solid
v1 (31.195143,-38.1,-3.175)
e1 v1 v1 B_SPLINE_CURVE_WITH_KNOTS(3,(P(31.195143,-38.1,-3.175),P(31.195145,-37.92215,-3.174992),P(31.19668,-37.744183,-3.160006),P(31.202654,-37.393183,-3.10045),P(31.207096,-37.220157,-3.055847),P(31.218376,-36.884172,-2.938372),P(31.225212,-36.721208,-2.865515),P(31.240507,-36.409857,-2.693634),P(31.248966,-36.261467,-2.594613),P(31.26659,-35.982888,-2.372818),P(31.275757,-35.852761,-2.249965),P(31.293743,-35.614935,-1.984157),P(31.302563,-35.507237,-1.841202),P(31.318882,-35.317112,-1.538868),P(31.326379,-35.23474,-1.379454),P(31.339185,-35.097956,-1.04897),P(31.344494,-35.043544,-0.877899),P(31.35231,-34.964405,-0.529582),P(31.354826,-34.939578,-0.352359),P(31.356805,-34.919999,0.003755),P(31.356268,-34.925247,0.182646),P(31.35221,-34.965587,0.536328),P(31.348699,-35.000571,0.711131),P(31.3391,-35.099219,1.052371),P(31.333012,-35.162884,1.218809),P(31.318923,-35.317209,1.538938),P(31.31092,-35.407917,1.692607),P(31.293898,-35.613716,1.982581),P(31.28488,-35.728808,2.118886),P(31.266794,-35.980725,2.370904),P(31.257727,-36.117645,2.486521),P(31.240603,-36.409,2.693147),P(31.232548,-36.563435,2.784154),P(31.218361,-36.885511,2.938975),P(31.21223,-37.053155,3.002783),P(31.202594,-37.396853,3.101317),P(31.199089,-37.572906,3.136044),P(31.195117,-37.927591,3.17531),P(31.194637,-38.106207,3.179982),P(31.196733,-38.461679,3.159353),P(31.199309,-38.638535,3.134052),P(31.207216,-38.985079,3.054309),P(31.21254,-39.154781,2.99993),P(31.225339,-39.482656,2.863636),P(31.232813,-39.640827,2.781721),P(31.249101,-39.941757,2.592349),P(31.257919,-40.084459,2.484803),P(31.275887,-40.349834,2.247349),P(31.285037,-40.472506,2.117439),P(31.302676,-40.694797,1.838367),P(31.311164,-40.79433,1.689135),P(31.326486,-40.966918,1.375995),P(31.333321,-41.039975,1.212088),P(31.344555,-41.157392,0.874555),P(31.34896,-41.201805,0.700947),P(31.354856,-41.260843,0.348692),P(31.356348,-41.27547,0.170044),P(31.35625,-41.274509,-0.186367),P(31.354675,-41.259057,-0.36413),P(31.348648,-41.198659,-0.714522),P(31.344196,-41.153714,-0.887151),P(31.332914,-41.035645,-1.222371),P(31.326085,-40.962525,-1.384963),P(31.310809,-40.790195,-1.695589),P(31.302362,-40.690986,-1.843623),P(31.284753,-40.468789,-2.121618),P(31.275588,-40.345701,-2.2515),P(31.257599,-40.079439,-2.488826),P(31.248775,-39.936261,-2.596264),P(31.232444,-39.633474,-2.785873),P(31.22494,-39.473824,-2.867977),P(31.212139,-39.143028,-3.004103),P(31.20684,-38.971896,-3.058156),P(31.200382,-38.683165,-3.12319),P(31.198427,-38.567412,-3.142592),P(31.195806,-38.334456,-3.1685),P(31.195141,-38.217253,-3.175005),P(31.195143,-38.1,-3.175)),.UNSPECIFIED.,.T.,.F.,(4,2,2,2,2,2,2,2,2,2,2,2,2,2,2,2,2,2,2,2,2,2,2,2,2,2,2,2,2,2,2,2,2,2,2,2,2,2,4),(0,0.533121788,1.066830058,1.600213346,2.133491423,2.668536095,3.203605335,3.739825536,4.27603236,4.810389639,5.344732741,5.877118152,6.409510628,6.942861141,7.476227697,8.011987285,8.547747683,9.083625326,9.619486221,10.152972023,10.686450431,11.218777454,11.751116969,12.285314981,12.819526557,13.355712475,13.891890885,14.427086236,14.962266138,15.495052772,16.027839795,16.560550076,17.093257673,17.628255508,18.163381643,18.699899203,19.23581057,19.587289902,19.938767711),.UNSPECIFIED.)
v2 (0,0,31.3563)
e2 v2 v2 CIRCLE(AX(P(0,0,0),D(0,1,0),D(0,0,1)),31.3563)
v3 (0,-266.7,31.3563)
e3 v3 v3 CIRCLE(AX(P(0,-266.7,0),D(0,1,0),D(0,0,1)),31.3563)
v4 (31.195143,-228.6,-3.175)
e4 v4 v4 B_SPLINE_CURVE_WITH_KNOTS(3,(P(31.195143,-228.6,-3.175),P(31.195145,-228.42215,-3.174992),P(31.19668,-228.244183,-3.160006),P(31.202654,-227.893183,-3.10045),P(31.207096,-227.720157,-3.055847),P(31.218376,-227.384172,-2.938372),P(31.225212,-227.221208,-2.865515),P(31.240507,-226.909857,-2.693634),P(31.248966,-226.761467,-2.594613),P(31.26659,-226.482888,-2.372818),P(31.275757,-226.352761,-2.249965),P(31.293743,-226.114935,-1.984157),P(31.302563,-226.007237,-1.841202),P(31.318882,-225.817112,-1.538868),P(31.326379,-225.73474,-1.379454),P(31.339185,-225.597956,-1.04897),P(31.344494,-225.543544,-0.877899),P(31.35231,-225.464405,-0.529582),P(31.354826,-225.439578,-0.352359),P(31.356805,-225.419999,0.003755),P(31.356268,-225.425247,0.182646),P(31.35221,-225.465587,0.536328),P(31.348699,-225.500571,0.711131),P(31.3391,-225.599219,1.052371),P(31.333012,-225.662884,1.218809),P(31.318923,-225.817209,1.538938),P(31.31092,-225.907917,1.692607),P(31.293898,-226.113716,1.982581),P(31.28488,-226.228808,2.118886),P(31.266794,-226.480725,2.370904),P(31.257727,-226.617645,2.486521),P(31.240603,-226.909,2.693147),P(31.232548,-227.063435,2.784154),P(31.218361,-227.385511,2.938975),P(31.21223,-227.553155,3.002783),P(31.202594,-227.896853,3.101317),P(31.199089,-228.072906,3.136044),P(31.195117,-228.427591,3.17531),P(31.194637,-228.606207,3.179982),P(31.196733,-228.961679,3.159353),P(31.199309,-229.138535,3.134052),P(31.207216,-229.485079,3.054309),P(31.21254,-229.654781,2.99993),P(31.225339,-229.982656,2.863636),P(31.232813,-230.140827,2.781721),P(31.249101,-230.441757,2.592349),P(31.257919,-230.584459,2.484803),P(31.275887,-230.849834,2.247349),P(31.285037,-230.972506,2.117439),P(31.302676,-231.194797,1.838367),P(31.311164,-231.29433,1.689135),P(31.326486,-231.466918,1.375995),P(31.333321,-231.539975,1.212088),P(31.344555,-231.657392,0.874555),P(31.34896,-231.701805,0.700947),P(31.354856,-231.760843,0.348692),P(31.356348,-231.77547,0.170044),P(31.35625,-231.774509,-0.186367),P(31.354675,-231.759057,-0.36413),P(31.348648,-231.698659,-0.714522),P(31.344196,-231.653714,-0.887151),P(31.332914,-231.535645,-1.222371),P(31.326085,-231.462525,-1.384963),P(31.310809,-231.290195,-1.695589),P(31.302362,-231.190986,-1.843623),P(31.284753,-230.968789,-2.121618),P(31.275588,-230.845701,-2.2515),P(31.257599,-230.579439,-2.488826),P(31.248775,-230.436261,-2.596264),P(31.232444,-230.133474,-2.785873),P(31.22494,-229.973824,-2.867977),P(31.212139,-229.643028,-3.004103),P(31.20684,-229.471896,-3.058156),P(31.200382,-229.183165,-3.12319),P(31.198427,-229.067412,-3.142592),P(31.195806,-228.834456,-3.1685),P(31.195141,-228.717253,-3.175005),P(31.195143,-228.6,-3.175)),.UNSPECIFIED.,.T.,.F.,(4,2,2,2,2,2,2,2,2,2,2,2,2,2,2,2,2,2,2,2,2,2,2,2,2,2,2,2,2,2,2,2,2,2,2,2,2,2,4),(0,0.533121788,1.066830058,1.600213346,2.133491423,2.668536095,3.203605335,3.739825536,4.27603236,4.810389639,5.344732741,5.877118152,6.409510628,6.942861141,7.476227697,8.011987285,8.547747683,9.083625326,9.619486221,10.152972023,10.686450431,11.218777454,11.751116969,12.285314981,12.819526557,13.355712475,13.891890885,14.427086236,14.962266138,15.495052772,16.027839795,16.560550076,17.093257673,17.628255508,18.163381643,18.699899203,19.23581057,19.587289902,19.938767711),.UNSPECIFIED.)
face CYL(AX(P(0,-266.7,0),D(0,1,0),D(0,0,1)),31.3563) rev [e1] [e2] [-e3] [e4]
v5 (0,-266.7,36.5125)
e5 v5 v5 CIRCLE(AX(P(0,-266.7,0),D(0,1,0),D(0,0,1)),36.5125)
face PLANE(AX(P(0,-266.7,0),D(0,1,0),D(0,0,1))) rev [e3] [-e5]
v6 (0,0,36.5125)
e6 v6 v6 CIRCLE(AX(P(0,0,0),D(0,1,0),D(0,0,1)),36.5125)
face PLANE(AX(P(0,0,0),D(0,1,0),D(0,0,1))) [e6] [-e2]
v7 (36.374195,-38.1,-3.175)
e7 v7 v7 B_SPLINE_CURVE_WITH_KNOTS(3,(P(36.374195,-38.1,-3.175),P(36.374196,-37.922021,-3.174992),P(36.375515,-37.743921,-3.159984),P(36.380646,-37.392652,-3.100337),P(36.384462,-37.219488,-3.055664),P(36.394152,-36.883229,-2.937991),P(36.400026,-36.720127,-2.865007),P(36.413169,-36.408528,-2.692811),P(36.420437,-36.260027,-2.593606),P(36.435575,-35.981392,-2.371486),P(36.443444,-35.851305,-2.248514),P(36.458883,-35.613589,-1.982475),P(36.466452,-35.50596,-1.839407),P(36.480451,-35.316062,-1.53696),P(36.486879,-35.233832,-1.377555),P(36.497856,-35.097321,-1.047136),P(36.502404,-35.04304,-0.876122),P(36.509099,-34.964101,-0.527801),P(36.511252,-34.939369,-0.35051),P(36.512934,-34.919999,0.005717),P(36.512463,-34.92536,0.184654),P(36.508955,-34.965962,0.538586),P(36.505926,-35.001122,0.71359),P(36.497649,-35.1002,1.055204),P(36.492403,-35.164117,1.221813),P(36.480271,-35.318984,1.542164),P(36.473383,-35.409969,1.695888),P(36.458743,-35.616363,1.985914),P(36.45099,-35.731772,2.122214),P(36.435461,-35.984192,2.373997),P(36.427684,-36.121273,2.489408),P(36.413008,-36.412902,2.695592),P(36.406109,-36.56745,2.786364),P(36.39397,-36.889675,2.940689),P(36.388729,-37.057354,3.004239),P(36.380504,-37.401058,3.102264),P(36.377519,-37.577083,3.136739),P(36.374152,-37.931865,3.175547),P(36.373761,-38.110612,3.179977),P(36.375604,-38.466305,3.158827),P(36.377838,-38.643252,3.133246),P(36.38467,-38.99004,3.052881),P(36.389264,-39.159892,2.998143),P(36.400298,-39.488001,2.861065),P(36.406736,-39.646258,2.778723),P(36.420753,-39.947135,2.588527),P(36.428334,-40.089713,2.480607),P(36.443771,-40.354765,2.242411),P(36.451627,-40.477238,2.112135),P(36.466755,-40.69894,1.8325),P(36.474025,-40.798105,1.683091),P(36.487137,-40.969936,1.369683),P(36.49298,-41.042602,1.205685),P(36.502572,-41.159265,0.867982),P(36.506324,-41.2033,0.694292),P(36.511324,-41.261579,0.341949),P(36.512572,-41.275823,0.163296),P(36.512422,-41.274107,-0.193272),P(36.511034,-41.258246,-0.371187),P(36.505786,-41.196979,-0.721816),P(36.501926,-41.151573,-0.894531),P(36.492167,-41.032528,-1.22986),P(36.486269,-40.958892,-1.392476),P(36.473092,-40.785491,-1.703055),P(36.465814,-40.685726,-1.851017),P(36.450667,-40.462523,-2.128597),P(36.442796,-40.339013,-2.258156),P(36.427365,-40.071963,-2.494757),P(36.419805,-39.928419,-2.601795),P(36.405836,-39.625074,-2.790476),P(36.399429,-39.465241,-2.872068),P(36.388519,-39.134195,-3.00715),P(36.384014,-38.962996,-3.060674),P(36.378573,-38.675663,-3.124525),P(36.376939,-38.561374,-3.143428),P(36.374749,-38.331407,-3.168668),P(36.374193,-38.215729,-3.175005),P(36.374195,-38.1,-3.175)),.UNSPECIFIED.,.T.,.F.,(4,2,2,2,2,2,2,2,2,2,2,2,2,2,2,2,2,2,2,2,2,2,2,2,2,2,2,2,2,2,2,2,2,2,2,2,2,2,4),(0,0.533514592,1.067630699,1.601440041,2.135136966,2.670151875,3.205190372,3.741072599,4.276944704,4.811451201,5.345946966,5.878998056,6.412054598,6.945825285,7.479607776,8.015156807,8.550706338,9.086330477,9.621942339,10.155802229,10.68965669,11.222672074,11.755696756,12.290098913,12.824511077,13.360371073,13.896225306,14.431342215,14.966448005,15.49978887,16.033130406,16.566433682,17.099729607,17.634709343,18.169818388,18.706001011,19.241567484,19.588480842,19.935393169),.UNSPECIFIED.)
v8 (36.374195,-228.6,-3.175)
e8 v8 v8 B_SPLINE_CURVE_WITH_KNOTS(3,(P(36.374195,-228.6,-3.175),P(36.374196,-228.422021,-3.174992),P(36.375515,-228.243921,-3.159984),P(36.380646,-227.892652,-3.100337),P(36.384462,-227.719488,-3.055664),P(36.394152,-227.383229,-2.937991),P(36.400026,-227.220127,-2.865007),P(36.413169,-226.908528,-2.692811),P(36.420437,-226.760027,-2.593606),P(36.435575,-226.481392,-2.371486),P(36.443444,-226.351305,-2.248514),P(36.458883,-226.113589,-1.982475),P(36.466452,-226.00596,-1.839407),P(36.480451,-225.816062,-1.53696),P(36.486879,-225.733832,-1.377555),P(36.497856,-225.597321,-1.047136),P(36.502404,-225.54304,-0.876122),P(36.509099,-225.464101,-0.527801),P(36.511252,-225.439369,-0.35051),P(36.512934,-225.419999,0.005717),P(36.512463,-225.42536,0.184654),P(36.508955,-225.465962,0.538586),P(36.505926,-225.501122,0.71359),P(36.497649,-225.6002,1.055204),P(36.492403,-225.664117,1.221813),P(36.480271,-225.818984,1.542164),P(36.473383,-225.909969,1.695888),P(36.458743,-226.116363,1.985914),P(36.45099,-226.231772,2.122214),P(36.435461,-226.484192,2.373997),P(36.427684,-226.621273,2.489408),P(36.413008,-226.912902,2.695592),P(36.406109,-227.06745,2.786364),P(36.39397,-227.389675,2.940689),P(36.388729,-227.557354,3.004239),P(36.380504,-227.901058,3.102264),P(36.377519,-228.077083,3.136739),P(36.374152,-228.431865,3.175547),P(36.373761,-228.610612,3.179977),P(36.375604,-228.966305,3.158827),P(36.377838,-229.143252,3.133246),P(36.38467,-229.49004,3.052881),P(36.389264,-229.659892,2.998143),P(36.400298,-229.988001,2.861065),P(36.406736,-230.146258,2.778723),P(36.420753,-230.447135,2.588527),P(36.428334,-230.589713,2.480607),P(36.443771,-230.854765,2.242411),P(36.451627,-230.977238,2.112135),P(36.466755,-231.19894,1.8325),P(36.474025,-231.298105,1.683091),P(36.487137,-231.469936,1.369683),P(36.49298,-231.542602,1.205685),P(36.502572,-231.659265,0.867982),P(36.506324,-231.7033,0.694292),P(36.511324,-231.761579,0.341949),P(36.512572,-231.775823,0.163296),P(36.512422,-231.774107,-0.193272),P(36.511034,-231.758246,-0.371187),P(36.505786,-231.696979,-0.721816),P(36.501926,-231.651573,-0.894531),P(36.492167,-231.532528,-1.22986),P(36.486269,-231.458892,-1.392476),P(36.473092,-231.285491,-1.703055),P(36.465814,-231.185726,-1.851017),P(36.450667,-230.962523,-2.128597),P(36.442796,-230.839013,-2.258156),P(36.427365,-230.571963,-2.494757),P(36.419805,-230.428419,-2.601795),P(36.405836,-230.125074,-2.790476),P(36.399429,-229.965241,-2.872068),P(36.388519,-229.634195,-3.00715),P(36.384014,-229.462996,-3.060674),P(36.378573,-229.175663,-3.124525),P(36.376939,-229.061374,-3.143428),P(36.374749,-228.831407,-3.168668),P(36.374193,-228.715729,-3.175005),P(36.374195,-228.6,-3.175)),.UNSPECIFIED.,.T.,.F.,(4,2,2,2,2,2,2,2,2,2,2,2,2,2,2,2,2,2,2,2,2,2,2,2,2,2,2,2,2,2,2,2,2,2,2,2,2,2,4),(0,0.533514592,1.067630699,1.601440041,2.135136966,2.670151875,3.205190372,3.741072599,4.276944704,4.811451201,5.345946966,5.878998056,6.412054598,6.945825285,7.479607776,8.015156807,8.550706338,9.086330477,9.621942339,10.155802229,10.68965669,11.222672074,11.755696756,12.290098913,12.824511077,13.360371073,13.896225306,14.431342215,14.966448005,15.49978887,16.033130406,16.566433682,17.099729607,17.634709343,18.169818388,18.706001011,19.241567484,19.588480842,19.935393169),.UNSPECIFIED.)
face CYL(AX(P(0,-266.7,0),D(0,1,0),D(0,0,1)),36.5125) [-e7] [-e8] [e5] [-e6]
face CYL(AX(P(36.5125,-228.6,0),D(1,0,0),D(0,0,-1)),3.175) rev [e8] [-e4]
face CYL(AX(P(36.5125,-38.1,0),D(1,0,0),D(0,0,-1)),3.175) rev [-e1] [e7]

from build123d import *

# Parameters (mm, degrees)
SKETCH1_R                           = 36.5125
SKETCH1_R_2                         = 31.3563
BOSS_EXTRUDE1_DEPTH                 = 266.7
F_1_4_START                         = 31.195142544
F_1_4_0_25_DIAMETER_HOLE1_OUTLINE_R = 3.175
F_1_4_0_25_DIAMETER_HOLE1_DEPTH     = 5.317357524


# Read off the part's stored shape, not the designer's step: 1/4 (0.25) Diameter Hole1
with BuildPart() as part:
    # Sketch1 → Boss-Extrude1 (new body)
    with BuildSketch(Plane(origin=(0, 0, 0), x_dir=(1, 0, 0), z_dir=(0, 1, 0))):
        with Locations(Location((0, 0, 0), (0, 0, 270))):
            Circle(SKETCH1_R)
        with Locations(Location((0, 0, 0), (0, 0, 270))):
            Circle(SKETCH1_R_2, mode=Mode.SUBTRACT)
    extrude(amount=-BOSS_EXTRUDE1_DEPTH)

    # 1/4 (0.25) Diameter Hole1 outline → 1/4 (0.25) Diameter Hole1 (cut)
    with BuildSketch(Plane.YZ.offset(F_1_4_START)):
        with Locations((-228.6, 0)):
            Circle(F_1_4_0_25_DIAMETER_HOLE1_OUTLINE_R)
        with Locations((-38.1, 0)):
            Circle(F_1_4_0_25_DIAMETER_HOLE1_OUTLINE_R)
    extrude(amount=F_1_4_0_25_DIAMETER_HOLE1_DEPTH, mode=Mode.SUBTRACT)


solid = part.part
